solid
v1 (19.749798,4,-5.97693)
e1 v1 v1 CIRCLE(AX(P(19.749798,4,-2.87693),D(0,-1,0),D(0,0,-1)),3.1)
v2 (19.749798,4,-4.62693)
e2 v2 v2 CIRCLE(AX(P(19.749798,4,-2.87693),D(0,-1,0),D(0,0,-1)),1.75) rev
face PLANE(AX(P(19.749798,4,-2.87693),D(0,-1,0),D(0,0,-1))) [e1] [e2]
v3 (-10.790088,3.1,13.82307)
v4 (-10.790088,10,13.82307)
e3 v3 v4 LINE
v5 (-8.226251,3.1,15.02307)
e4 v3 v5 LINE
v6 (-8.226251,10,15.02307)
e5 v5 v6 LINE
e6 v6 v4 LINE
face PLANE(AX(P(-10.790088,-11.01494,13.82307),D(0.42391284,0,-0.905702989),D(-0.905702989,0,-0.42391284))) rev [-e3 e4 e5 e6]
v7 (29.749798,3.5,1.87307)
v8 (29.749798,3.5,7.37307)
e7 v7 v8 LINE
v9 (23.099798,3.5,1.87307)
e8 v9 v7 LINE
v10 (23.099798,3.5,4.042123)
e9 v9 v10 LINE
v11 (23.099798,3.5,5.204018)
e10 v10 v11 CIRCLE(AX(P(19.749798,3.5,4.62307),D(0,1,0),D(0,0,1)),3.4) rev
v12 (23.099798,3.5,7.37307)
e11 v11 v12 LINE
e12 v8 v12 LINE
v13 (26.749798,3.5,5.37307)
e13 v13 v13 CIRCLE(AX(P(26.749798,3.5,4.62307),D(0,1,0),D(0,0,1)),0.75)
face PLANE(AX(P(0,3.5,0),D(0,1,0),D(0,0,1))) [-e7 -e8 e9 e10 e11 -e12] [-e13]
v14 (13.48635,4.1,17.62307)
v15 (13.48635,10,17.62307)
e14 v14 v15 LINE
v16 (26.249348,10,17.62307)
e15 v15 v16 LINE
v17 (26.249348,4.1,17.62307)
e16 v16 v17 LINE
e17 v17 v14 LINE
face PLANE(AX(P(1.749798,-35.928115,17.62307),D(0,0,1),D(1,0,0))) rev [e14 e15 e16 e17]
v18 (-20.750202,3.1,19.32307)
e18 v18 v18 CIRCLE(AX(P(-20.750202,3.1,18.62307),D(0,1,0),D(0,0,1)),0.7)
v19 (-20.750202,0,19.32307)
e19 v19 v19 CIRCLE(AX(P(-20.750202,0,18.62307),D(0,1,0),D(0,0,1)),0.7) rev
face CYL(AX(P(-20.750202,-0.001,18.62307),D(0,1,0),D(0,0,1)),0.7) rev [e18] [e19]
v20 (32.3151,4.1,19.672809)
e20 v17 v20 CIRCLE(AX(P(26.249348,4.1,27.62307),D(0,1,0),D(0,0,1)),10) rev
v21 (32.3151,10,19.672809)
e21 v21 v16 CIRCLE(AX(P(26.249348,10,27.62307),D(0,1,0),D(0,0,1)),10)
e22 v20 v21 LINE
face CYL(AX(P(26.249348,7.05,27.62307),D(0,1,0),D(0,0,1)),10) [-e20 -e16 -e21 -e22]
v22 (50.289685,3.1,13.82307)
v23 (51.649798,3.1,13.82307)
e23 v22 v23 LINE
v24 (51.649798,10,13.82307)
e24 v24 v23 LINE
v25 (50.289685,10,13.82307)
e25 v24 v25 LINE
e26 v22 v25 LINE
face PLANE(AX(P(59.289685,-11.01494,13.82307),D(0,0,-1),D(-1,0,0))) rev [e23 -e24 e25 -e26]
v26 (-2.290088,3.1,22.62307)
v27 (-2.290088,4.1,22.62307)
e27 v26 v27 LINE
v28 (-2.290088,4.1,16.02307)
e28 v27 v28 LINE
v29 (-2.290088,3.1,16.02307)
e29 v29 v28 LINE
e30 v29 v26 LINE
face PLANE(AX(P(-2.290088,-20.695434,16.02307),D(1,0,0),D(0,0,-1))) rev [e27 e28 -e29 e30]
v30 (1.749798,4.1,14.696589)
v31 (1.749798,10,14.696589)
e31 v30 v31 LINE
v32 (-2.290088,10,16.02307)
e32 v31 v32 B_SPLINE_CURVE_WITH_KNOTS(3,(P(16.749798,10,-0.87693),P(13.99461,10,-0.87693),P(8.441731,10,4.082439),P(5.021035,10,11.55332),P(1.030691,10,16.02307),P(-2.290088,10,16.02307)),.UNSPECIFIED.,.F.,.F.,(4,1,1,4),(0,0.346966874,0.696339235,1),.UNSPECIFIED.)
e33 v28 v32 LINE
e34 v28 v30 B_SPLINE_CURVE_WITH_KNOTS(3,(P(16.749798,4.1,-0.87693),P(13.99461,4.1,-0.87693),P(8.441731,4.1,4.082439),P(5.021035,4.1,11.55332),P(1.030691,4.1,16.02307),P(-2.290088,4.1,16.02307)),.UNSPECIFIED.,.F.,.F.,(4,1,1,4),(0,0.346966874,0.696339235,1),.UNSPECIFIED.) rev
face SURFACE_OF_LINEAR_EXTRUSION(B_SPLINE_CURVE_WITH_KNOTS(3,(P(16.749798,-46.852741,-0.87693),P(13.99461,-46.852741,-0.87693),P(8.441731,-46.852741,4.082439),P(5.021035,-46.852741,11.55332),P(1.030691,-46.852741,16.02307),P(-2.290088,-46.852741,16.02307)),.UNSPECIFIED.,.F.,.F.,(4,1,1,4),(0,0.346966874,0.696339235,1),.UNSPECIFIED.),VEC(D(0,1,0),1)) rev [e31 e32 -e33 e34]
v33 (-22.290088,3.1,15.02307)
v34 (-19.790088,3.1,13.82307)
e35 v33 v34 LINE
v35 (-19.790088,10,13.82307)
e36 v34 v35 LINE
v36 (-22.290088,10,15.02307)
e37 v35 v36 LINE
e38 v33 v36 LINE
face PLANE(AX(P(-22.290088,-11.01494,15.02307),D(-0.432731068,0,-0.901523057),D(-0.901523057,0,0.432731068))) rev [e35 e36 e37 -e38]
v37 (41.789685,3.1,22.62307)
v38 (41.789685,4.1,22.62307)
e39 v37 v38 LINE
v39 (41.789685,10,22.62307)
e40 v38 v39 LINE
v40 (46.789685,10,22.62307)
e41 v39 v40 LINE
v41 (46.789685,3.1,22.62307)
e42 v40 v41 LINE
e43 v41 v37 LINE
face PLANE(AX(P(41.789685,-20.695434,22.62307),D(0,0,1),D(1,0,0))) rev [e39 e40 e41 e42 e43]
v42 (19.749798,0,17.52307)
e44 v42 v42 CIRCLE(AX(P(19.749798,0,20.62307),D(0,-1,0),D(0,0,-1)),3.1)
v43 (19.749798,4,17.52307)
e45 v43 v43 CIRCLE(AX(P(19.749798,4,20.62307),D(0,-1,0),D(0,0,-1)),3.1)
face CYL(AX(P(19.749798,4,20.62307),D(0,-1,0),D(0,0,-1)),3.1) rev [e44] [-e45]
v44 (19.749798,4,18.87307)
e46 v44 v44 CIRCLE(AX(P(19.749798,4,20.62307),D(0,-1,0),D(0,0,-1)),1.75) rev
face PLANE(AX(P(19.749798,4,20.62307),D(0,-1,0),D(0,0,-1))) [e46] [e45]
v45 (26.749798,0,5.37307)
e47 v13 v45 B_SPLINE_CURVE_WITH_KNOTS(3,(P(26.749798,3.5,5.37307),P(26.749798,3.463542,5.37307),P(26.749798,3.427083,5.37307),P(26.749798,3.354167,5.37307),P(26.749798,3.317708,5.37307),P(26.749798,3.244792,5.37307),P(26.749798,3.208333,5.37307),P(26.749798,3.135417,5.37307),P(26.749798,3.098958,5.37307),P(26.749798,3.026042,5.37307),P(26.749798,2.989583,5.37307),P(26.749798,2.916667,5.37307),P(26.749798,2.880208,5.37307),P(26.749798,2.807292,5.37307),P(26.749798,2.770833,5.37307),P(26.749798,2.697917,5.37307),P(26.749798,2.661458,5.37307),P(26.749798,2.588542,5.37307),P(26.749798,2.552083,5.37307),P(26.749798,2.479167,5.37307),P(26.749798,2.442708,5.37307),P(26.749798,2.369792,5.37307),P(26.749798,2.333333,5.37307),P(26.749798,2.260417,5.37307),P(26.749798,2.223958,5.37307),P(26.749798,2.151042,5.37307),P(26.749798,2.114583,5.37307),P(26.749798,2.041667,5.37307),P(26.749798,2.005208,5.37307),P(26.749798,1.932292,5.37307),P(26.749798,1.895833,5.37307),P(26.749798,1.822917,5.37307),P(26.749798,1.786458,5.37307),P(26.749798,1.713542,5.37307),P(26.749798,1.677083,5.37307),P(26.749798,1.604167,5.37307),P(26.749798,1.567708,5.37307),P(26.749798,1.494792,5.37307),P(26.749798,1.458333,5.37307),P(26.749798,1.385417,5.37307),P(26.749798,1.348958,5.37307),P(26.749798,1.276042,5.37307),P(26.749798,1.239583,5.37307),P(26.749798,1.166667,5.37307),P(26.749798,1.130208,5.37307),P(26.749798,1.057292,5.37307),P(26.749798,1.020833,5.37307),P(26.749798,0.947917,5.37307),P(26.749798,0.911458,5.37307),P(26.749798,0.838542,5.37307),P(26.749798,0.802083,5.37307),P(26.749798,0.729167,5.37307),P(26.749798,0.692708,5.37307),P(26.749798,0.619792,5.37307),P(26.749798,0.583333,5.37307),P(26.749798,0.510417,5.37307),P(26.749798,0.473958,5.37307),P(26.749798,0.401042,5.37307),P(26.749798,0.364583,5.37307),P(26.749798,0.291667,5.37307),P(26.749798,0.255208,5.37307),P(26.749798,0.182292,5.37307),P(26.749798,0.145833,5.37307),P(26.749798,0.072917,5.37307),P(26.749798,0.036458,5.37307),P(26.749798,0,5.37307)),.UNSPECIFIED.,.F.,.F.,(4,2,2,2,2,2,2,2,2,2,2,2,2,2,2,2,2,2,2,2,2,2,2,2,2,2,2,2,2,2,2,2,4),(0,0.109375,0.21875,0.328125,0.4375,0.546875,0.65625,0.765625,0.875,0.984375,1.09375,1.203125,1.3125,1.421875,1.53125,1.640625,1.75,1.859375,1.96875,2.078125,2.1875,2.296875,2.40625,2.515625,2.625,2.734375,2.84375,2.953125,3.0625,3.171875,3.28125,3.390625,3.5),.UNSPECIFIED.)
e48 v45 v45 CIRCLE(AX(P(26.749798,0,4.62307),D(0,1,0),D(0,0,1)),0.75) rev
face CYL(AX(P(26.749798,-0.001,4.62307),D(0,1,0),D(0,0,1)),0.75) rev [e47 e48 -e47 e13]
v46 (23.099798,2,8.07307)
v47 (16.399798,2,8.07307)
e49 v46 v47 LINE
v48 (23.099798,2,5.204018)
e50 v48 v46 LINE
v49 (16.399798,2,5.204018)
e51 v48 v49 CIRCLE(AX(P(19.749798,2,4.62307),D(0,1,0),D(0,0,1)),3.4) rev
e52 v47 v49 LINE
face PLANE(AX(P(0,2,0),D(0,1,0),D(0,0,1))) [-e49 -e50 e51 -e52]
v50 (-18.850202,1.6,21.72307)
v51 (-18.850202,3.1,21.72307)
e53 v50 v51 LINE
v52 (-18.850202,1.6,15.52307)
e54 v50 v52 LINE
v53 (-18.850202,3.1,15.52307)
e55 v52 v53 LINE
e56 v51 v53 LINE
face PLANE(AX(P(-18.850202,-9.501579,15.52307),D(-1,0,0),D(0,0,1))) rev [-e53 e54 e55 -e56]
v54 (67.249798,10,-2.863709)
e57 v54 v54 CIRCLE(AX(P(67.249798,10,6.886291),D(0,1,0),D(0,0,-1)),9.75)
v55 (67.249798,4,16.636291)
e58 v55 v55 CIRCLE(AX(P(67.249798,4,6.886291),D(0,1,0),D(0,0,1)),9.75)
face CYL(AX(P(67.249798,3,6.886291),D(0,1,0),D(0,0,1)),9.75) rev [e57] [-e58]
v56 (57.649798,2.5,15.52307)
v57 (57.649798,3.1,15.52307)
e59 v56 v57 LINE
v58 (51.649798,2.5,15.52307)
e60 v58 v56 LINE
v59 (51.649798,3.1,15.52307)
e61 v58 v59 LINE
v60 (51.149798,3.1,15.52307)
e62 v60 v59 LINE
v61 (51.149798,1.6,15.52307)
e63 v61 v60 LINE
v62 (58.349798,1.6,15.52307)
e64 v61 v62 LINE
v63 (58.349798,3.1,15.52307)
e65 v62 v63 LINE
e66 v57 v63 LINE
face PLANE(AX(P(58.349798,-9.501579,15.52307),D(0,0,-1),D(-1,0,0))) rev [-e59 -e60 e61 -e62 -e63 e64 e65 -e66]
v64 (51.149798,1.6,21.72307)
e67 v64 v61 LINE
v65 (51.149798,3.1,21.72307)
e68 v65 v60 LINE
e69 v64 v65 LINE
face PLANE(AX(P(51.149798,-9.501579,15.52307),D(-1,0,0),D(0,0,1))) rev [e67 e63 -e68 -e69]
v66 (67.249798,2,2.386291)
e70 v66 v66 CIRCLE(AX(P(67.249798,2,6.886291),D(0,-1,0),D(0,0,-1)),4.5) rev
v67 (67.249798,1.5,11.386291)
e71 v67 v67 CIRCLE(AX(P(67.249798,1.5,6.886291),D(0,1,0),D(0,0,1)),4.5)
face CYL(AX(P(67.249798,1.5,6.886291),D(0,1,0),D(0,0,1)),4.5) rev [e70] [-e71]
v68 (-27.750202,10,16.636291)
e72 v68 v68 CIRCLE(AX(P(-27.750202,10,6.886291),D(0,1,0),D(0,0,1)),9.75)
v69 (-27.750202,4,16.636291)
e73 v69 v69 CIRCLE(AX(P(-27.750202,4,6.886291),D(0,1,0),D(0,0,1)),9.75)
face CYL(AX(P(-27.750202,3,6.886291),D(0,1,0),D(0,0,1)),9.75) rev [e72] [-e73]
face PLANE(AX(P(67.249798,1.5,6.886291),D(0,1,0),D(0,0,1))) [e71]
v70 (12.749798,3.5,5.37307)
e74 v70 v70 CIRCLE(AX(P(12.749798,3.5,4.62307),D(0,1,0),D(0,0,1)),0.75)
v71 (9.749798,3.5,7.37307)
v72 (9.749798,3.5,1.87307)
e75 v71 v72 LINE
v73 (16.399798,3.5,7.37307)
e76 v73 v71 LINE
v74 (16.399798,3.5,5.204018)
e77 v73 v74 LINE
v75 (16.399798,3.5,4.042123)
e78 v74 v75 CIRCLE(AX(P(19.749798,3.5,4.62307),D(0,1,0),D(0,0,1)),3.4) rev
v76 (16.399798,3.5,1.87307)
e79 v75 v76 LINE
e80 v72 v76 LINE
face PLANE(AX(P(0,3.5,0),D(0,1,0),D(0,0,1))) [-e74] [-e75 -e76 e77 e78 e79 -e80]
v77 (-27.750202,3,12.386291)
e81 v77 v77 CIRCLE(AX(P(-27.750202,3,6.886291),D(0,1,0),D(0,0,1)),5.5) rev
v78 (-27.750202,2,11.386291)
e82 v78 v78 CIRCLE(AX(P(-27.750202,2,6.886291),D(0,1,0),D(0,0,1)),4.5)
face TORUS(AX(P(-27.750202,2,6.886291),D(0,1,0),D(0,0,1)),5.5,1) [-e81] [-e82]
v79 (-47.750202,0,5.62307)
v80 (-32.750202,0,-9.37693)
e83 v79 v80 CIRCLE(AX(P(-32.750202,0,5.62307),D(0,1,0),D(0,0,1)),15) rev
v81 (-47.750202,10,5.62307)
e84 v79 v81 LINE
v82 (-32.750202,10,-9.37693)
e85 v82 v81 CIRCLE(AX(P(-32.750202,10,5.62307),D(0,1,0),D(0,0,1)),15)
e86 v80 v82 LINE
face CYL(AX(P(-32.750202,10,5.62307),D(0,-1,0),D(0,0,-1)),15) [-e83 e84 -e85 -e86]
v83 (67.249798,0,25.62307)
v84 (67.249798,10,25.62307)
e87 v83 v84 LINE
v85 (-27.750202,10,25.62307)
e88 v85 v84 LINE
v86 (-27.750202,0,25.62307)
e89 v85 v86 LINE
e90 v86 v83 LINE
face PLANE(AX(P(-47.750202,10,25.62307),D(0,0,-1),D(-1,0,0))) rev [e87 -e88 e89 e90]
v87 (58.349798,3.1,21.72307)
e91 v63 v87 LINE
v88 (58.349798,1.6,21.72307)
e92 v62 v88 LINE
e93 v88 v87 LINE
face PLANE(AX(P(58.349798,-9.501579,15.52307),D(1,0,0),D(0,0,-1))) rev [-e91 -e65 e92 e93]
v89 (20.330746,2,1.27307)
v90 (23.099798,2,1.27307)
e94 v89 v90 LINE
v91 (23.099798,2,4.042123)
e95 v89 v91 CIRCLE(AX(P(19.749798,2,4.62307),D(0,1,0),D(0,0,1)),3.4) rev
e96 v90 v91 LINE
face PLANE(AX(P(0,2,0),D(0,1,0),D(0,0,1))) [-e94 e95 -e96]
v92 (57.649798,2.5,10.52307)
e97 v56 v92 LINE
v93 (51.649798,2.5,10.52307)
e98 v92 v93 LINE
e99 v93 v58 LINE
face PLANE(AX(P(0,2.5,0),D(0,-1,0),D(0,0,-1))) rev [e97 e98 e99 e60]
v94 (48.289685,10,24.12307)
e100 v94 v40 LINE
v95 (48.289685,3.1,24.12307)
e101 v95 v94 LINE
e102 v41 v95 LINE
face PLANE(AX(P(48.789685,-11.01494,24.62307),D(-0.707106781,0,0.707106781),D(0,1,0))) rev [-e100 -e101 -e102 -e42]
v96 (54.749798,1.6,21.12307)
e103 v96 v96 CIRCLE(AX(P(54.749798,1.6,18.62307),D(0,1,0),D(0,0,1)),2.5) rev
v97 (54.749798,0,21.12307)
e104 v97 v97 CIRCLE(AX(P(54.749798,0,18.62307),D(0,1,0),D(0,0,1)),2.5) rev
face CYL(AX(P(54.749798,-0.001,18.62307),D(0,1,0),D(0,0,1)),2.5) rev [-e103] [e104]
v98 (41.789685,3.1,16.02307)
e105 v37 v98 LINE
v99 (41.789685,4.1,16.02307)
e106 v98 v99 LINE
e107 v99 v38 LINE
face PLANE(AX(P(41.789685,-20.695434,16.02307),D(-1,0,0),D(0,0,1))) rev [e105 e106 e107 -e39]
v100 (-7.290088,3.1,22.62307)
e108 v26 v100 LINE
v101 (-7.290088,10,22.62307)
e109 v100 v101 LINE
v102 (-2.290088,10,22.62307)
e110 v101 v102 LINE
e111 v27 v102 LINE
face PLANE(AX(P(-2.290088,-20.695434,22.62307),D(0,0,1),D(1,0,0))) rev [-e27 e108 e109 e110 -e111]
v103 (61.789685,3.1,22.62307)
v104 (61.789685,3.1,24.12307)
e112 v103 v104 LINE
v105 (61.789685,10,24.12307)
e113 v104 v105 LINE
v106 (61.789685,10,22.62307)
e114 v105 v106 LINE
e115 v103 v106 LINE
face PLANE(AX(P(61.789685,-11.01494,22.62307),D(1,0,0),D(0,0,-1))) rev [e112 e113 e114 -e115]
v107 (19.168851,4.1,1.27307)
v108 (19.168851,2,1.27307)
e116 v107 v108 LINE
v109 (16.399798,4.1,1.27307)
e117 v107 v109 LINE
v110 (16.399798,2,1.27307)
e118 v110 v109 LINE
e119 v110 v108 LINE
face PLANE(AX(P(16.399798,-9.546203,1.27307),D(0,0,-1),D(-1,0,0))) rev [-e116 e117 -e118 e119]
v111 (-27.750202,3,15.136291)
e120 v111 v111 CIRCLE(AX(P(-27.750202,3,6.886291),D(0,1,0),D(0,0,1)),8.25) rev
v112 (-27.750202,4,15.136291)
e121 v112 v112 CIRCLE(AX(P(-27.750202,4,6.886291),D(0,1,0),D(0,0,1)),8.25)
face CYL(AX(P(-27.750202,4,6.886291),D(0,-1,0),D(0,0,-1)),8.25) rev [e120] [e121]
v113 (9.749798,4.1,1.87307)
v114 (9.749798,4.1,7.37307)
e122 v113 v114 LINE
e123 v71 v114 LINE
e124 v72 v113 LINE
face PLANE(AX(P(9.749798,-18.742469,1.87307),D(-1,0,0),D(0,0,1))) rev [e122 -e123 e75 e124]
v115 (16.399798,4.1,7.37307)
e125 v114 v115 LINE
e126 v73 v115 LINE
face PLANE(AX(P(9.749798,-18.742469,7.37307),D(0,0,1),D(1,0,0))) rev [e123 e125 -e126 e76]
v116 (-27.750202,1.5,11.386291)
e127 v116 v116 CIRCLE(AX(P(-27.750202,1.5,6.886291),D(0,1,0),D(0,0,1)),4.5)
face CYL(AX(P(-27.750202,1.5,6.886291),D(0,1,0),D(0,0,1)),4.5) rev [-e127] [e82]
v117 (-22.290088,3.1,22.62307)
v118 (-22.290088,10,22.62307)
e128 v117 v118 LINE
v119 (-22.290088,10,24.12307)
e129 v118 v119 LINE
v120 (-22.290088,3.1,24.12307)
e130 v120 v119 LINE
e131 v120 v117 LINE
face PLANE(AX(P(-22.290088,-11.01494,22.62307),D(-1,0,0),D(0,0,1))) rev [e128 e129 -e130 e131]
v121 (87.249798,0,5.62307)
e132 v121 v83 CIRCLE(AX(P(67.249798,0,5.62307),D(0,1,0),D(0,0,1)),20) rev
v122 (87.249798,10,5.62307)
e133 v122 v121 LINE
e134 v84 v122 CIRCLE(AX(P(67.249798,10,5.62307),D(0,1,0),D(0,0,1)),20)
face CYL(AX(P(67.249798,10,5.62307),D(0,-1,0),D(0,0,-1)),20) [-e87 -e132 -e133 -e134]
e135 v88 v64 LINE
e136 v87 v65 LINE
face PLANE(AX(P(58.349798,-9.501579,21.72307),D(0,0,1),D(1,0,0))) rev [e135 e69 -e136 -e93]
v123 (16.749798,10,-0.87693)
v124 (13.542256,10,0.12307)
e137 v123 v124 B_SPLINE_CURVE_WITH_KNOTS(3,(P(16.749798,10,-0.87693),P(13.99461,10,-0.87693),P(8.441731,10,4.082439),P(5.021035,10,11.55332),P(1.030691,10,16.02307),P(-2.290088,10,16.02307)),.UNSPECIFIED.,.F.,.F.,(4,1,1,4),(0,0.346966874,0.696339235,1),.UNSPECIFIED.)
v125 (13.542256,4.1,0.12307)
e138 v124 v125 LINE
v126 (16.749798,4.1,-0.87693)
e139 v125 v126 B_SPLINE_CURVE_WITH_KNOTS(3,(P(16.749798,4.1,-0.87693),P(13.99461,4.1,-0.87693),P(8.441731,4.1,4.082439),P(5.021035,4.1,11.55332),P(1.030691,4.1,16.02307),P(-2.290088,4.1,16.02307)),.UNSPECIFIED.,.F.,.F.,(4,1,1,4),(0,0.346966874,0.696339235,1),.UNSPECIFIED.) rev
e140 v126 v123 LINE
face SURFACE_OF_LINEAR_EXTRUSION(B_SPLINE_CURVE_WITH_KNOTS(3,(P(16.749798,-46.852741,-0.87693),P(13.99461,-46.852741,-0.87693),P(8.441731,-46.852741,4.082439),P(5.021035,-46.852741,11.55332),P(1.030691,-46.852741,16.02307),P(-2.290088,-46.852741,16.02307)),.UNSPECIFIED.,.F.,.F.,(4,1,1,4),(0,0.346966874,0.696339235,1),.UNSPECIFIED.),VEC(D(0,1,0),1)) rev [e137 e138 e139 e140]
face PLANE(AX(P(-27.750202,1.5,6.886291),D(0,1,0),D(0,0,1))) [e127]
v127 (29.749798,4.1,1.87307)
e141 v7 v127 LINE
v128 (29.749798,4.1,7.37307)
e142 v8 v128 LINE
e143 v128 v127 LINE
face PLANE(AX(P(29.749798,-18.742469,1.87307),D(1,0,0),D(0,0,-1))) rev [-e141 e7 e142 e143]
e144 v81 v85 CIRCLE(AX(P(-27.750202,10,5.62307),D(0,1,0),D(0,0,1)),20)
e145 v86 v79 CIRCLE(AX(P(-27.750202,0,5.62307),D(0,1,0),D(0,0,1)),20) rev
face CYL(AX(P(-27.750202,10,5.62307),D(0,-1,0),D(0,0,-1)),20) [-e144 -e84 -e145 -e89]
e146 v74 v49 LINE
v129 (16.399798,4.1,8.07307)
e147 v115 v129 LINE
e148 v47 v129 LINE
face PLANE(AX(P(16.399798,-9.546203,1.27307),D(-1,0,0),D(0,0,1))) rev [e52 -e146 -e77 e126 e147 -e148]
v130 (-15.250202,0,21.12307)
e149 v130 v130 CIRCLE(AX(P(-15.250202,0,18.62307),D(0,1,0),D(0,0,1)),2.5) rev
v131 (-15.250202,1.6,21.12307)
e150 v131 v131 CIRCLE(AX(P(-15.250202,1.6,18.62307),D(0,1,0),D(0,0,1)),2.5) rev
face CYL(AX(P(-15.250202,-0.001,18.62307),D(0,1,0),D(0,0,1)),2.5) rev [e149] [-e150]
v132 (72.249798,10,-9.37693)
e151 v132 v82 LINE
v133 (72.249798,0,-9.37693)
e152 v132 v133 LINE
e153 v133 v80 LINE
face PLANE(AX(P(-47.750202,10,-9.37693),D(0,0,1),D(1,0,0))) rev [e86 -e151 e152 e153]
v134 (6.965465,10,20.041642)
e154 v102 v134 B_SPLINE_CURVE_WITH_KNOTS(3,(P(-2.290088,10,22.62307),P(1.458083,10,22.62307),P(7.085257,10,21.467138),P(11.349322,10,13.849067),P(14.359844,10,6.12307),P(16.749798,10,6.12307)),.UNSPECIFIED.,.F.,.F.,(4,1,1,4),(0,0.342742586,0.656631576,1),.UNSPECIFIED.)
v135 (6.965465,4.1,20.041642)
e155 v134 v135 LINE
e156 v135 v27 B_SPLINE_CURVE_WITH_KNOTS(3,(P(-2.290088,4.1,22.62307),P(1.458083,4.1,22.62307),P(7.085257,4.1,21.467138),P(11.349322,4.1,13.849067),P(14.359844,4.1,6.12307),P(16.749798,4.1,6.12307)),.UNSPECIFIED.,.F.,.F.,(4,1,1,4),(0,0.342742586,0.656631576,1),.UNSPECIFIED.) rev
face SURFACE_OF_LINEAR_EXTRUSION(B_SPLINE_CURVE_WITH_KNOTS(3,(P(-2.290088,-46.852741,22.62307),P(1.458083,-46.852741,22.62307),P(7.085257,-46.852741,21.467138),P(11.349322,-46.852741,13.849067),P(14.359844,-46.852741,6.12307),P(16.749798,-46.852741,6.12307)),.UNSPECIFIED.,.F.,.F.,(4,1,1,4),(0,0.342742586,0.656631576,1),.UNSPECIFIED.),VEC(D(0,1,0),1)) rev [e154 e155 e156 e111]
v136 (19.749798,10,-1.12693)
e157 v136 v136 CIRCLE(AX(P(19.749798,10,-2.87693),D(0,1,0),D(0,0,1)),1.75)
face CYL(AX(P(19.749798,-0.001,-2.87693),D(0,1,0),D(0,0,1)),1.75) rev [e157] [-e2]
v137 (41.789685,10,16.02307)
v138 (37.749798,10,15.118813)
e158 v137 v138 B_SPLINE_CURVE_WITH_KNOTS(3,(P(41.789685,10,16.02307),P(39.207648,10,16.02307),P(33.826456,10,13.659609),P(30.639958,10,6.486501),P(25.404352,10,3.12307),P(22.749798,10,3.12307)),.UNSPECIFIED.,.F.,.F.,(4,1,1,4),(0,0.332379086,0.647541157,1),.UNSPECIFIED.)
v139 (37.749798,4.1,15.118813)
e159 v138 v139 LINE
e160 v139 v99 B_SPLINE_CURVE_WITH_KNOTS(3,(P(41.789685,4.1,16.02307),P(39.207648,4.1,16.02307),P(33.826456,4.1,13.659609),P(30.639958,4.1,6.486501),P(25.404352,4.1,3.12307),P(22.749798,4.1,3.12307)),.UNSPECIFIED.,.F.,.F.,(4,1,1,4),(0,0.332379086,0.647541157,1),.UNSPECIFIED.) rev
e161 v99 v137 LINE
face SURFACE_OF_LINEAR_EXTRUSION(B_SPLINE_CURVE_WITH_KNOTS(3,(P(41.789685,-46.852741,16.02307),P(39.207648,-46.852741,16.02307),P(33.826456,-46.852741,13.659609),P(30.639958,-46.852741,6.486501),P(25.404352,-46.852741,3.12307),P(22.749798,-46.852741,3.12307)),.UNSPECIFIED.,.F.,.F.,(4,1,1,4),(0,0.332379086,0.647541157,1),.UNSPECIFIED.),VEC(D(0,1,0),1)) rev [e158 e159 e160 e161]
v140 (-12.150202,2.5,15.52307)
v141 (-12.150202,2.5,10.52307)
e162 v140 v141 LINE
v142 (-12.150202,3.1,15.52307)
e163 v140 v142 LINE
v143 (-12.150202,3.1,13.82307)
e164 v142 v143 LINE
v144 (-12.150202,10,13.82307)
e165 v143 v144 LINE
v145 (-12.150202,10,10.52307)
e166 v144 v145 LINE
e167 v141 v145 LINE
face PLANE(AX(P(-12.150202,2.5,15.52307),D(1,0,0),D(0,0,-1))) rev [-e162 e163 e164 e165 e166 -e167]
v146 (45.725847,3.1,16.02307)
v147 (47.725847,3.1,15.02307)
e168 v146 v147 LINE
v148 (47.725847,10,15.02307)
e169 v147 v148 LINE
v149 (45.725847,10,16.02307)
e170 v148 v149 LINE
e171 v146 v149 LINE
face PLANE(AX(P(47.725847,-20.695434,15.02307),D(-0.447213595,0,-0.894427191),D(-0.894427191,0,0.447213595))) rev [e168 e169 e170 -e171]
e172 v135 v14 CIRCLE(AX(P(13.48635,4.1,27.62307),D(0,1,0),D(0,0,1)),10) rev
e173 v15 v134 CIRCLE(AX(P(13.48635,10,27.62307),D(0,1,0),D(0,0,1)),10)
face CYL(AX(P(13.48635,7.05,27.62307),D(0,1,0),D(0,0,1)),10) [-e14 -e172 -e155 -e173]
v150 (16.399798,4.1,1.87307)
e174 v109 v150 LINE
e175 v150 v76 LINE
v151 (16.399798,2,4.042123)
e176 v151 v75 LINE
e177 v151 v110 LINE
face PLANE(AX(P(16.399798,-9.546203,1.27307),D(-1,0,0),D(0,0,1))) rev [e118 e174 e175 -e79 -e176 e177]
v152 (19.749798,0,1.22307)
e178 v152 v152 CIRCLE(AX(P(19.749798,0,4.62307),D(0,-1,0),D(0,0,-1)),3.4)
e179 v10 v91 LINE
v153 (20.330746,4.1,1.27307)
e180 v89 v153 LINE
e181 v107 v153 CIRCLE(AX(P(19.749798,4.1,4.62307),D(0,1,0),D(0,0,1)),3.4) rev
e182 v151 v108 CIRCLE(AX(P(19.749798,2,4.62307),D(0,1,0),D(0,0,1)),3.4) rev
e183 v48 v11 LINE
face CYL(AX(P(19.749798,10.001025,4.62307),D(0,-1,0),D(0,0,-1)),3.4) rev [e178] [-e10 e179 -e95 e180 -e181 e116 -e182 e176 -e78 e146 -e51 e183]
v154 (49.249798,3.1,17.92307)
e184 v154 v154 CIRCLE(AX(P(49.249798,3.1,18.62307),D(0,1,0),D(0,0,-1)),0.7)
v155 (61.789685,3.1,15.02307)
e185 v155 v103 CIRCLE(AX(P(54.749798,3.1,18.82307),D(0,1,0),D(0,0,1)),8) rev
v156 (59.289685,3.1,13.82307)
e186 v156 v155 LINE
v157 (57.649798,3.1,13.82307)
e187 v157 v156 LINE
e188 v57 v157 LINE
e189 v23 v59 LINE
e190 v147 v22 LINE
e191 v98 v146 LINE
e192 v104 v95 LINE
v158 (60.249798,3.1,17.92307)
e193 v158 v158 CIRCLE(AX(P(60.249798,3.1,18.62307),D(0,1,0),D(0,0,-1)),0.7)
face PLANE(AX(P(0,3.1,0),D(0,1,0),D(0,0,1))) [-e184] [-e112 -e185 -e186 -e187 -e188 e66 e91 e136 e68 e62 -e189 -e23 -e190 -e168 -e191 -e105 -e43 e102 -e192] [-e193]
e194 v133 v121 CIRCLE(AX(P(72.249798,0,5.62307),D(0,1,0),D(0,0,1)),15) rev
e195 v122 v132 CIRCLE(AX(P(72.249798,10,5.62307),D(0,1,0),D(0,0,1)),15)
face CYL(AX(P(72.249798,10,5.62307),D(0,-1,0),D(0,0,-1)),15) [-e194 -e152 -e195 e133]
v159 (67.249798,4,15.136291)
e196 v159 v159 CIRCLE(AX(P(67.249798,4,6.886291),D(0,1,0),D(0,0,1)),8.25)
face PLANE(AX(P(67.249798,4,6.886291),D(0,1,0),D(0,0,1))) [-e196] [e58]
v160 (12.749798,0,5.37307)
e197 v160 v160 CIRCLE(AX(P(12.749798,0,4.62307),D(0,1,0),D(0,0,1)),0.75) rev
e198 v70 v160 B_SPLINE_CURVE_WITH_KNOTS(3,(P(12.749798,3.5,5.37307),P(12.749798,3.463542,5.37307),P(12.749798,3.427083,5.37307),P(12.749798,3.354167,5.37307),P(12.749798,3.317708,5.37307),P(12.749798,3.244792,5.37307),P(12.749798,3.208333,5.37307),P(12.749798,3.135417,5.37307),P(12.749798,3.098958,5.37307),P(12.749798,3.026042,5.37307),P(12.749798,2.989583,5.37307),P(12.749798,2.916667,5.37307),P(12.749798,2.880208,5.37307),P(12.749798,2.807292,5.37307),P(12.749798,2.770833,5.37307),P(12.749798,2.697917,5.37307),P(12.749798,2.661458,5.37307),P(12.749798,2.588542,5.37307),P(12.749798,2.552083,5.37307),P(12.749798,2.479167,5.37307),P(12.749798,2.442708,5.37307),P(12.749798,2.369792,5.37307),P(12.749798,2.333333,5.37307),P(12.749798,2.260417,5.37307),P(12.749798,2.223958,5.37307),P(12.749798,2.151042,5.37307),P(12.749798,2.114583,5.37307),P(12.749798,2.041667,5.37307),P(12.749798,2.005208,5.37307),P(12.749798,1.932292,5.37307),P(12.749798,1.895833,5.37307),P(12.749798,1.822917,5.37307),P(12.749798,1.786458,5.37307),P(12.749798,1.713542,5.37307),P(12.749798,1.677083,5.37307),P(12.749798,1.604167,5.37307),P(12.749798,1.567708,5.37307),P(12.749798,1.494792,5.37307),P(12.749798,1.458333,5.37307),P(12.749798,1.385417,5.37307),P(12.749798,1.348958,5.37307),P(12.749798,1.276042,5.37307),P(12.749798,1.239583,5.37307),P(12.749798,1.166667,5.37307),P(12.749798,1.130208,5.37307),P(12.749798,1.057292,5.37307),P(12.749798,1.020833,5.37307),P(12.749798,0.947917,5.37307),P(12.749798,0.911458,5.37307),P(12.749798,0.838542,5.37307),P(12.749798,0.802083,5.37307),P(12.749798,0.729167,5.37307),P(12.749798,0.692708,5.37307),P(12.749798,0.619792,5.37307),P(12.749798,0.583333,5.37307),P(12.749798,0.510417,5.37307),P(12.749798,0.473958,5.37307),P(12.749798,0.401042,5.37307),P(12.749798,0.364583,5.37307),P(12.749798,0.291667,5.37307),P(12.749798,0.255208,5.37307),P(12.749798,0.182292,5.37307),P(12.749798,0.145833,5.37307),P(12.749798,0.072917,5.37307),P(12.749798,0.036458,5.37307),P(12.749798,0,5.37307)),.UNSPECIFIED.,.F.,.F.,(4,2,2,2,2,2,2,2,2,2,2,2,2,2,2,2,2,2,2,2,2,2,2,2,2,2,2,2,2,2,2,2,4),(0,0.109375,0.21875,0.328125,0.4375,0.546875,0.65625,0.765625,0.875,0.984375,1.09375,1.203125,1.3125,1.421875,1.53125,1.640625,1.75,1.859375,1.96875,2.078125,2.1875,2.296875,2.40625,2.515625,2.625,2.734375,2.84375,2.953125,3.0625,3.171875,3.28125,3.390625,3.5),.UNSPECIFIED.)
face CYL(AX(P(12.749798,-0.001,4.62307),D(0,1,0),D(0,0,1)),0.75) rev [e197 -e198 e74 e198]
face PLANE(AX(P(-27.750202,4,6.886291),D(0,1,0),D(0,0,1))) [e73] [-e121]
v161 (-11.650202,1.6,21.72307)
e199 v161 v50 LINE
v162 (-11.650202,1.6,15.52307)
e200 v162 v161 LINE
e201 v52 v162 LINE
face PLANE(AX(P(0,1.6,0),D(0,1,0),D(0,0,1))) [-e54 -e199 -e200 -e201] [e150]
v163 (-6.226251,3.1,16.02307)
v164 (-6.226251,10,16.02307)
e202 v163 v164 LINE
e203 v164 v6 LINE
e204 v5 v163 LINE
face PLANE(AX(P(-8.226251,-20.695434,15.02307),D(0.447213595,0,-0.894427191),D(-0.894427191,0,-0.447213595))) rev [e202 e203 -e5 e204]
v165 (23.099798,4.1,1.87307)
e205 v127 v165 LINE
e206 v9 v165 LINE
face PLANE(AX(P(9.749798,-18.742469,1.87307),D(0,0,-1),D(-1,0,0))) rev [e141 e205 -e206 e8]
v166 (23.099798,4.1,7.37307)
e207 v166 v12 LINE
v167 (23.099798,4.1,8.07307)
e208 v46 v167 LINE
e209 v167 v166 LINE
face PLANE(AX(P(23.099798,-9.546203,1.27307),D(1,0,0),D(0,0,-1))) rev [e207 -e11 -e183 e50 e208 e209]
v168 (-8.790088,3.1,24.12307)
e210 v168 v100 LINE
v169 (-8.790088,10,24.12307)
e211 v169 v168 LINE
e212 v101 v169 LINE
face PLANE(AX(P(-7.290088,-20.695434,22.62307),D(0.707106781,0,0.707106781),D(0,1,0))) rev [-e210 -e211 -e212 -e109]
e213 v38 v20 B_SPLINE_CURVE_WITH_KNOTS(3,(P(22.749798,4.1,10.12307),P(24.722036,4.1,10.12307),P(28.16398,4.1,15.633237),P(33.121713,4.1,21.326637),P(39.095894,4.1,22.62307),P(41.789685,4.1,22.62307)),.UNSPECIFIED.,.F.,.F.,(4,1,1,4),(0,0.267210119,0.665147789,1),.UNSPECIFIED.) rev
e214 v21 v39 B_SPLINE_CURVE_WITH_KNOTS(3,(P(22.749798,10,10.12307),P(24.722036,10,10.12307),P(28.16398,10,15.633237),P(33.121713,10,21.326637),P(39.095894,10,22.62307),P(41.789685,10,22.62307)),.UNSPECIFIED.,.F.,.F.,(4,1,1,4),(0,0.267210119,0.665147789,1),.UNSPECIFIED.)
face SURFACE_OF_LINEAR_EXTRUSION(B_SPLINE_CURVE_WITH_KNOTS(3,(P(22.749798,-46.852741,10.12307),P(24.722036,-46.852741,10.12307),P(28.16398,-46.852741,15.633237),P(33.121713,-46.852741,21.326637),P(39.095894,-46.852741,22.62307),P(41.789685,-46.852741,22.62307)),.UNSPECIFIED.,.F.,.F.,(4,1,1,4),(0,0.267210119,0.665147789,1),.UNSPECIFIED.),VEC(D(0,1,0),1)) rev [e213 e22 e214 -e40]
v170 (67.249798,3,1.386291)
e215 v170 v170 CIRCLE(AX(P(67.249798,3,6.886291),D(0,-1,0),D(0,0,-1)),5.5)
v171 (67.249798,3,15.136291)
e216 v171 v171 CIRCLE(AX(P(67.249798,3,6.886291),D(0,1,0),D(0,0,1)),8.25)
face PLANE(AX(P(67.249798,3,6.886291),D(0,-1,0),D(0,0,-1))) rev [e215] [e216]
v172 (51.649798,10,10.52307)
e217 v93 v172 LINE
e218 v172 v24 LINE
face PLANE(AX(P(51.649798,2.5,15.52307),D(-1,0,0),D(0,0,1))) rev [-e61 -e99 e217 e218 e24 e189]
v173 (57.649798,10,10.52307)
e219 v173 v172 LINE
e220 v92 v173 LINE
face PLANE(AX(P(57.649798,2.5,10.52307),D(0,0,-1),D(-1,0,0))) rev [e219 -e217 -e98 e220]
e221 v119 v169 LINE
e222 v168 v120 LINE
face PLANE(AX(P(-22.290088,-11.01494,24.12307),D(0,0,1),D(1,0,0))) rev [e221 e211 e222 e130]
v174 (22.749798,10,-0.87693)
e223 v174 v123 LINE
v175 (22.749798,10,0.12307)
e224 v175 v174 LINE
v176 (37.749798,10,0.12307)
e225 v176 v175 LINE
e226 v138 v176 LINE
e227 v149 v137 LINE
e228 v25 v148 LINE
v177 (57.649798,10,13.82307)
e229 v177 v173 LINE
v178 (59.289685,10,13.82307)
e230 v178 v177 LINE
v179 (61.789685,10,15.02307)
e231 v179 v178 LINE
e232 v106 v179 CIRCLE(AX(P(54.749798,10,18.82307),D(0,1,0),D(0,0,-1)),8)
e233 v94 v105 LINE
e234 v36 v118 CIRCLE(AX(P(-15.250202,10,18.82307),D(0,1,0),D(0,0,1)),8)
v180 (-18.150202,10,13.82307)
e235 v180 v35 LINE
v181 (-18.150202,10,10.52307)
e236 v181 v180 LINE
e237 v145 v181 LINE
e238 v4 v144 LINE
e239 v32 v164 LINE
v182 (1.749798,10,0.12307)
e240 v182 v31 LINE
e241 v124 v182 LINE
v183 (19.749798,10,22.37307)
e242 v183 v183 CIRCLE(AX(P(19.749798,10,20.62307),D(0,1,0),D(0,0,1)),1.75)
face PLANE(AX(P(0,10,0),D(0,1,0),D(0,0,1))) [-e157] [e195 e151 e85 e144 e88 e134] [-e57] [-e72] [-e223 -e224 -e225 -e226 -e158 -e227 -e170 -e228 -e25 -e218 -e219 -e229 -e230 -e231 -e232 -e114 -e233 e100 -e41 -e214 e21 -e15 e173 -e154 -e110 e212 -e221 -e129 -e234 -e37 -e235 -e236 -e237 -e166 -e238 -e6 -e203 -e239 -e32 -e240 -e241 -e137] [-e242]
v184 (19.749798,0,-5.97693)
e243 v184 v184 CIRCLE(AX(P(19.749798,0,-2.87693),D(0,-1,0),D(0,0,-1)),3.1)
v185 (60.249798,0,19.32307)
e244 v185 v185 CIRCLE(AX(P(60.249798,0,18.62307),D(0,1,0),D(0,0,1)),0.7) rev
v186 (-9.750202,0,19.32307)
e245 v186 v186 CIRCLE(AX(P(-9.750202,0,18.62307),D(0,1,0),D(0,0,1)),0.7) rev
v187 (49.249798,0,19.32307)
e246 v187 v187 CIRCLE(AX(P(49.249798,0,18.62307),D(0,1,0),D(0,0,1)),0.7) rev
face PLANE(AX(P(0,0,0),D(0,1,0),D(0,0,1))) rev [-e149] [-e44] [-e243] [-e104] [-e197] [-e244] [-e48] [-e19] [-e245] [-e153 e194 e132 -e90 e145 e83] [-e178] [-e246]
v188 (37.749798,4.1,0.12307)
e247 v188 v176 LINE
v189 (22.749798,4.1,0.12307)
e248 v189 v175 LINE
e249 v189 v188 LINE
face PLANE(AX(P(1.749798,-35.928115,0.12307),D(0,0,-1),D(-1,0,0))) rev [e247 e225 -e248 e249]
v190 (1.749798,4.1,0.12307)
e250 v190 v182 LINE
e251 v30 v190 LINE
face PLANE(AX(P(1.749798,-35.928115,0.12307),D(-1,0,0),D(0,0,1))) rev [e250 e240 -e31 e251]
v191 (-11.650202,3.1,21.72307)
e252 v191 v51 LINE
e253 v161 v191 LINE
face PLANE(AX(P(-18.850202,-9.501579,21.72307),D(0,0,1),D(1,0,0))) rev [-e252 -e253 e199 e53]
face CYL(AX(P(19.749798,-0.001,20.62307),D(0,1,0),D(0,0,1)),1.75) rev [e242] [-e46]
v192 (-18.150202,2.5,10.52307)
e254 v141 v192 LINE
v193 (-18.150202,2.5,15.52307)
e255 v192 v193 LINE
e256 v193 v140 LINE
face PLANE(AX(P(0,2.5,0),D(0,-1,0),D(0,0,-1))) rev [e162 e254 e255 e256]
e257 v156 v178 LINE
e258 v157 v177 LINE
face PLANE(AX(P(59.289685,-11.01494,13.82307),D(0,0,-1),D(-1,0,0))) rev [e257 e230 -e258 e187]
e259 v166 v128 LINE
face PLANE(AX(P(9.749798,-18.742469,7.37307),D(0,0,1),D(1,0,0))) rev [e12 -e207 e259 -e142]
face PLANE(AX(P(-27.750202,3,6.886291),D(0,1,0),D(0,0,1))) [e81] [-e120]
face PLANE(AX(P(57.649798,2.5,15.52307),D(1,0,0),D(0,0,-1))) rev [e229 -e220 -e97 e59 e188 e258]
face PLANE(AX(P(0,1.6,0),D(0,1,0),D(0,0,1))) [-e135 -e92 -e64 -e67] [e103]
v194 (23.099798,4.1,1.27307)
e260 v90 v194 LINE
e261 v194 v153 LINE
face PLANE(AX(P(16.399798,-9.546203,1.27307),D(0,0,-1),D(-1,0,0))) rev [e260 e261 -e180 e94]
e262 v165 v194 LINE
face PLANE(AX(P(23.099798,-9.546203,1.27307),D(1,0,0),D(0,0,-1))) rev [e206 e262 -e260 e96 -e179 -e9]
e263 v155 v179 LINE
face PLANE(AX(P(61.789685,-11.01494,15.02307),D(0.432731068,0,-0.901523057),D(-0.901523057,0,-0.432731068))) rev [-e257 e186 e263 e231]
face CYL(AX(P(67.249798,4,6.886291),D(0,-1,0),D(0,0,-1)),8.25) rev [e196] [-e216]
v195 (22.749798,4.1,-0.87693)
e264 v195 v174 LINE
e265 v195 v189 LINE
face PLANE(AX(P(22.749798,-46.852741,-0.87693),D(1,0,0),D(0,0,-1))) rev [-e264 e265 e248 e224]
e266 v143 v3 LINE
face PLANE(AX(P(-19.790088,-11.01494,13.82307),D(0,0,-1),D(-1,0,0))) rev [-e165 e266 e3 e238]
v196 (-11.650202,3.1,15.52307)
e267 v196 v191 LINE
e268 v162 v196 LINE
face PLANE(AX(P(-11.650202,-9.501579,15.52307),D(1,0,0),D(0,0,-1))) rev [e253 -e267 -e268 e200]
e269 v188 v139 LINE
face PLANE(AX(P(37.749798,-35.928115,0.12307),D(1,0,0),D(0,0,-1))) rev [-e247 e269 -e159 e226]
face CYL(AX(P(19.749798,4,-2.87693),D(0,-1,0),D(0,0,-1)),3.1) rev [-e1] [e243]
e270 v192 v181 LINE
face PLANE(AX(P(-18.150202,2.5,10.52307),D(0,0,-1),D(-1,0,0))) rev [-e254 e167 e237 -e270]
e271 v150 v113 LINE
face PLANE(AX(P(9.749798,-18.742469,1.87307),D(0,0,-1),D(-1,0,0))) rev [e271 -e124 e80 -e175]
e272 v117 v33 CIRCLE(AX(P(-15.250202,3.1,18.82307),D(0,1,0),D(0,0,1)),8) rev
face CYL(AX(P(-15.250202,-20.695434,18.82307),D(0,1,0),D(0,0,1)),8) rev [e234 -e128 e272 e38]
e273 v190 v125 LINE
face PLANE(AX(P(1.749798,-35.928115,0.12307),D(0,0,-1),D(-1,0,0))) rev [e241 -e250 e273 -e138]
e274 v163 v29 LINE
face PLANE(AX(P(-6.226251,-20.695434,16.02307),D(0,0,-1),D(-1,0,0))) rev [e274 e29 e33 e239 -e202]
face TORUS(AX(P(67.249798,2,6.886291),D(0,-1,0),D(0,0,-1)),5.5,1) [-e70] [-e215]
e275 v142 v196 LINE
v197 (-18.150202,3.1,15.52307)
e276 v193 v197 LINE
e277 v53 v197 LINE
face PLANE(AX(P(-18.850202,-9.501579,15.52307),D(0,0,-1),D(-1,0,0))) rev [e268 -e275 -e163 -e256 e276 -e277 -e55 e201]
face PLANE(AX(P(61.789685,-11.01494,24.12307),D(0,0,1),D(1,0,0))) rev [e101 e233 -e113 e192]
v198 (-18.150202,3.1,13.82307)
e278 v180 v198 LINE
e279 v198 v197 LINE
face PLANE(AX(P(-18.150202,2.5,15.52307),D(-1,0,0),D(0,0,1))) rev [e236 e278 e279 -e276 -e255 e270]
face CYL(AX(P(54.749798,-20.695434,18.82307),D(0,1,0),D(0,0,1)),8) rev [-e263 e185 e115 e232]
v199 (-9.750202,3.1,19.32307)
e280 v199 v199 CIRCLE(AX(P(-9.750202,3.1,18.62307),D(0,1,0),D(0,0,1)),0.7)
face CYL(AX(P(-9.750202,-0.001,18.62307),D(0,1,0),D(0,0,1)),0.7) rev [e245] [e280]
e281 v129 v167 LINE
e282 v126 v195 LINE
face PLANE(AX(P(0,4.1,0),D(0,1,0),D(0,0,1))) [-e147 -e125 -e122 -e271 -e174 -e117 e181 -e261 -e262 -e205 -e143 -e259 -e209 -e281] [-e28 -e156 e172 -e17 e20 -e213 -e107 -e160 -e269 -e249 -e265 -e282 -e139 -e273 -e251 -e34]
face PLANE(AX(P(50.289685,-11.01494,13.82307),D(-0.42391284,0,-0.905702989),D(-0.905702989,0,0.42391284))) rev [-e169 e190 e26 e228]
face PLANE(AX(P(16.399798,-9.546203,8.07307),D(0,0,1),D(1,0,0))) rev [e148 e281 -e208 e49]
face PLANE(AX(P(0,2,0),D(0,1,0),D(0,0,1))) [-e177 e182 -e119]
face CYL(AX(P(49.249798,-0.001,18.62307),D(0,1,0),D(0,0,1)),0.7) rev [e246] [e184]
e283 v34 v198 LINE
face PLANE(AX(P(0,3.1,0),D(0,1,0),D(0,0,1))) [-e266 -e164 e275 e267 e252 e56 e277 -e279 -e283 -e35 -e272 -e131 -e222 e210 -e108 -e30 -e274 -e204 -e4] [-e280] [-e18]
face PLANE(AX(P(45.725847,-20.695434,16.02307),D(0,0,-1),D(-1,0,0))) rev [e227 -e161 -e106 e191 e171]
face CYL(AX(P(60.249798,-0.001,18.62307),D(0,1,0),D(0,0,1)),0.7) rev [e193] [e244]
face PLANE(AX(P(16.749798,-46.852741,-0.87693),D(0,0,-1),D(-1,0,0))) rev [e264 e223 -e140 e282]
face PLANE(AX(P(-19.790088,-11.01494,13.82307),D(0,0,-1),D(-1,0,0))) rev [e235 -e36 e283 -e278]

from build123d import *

# Parameters (mm, degrees)
SKETCH1_W                = 135
SKETCH1_H                = 35
BOSS_EXTRUDE1_DEPTH      = 10
FILLET1_R                = 20
CUT_EXTRUDE3_REACH       = 93.483
SKETCH5_R                = 1.75
SKETCH6_R                = 3.1
CUT_EXTRUDE4_DEPTH       = 4
FILLET2_R                = 15
SKETCH3_R                = 9.75
CUT_EXTRUDE5_DEPTH       = 7
BOSS_EXTRUDE2_START      = 1
SKETCH9_R                = 9.75
SKETCH9_R_2              = 8.25
BOSS_EXTRUDE2_DEPTH      = 1
SKETCH10_R               = 4.5
CUT_EXTRUDE6_DEPTH       = 1.5
FILLET3_R                = 1
CUT_EXTRUDE7_REACH       = 93.483
SKETCH7_R                = 2.5
SKETCH11_W               = 7.2
SKETCH11_H               = 6.2
CUT_EXTRUDE8_DEPTH       = 8.4
CUT_EXTRUDE9_DEPTH       = 6.9
CUT_EXTRUDE10_DEPTH      = 5.9
CUT_EXTRUDE11_REACH      = 93.483
SKETCH14_R               = 3.4
CUT_EXTRUDE12_DEPTH      = 5.9
CUT_EXTRUDE12_DEPTH_BACK = 2.1
SKETCH15_W               = 6.7
SKETCH15_H               = 6.8
SKETCH16_W               = 36
SKETCH16_H               = 17.5
CUT_EXTRUDE13_DEPTH      = 5.9
SKETCH18_W               = 6
SKETCH18_H               = 5
CUT_EXTRUDE14_DEPTH      = 7.5
SKETCH19_W               = 13
SKETCH19_H               = 1.5
CUT_EXTRUDE15_DEPTH      = 6.9
CHAMFER1_SIZE            = 2
CUT_EXTRUDE16_REACH      = 93.196
SKETCH20_R               = 0.7
SKETCH22_W               = 20
SKETCH22_H               = 5.5
CUT_EXTRUDE18_DEPTH      = 0.6
CUT_EXTRUDE19_REACH      = 93.166
SKETCH23_R               = 0.75
FILLET4_R                = 10


# Some blends are built 0.0001 mm under size
with BuildPart() as part:
    # Sketch1 → Boss-Extrude1 (new body)
    with BuildSketch(Plane(origin=(0, 0, 0), x_dir=(1, 0, 0), z_dir=(0, 1, 0))):
        with Locations((19.749798241, -8.123070146)):
            Rectangle(SKETCH1_W, SKETCH1_H)
    extrude(amount=BOSS_EXTRUDE1_DEPTH)

    # Fillet1
    fillet1_edges = [part.edges().sort_by_distance(p)[0] for p in [
        (87.249798241, 5, 25.623070146),
        (-47.750201759, 5, 25.623070146),
    ]]
    fillet(fillet1_edges, radius=FILLET1_R)

    # Sketch5 → Cut-Extrude3 (cut, up to next)
    with BuildSketch(Plane(origin=(0, 10, 0), x_dir=(1, 0, 0), z_dir=(0, 1, 0)), mode=Mode.PRIVATE) as cut_extrude3_sk1:
        with Locations(Location((19.749798241, 2.876929854, 0), (0, 0, 270))):
            Circle(SKETCH5_R)
    cut_extrude3_tool1 = extrude(cut_extrude3_sk1.sketch, amount=-CUT_EXTRUDE3_REACH, mode=Mode.PRIVATE) & part.part
    # Sketch5 → Cut-Extrude3 (cut, up to next)
    with BuildSketch(Plane(origin=(0, 10, 0), x_dir=(1, 0, 0), z_dir=(0, 1, 0)), mode=Mode.PRIVATE) as cut_extrude3_sk2:
        with Locations(Location((19.749798241, -20.623070146, 0), (0, 0, 270))):
            Circle(SKETCH5_R)
    cut_extrude3_tool2 = extrude(cut_extrude3_sk2.sketch, amount=-CUT_EXTRUDE3_REACH, mode=Mode.PRIVATE) & part.part
    add(cut_extrude3_tool1.solids().sort_by_distance((19.749798, 10, -2.87693))[0], mode=Mode.SUBTRACT)
    add(cut_extrude3_tool2.solids().sort_by_distance((19.749798, 10, 20.62307))[0], mode=Mode.SUBTRACT)

    # Sketch6 → Cut-Extrude4 (cut)
    with BuildSketch(Plane.XZ):
        with Locations(Location((19.749798241, 20.623070146, 0), (0, 0, 270))):
            Circle(SKETCH6_R)
        with Locations(Location((19.749798241, -2.876929854, 0), (0, 0, 270))):
            Circle(SKETCH6_R)
    extrude(amount=-CUT_EXTRUDE4_DEPTH, mode=Mode.SUBTRACT)

    # Fillet2
    fillet2_edges = [part.edges().sort_by_distance(p)[0] for p in [
        (-47.750201759, 5, -9.376929854),
        (87.249798241, 5, -9.376929854),
    ]]
    fillet(fillet2_edges, radius=FILLET2_R - 0.0001)  # a hair under: the kernel refuses the full size

    # Sketch3 → Cut-Extrude5 (cut)
    with BuildSketch(Plane(origin=(0, 10, 0), x_dir=(1, 0, 0), z_dir=(0, 1, 0))):
        with Locations(Location((-27.750201759, -6.88629089, 0), (0, 0, 270))):
            Circle(SKETCH3_R)
        with Locations(Location((67.249798241, -6.88629089, 0), (0, 0, 90))):
            Circle(SKETCH3_R)
    extrude(amount=-CUT_EXTRUDE5_DEPTH, mode=Mode.SUBTRACT)

    # Sketch9 → Boss-Extrude2 (add)
    # profile 1 of 2: a face of its own
    with BuildSketch(Plane(origin=(0, 3, 0), x_dir=(1, 0, 0), z_dir=(0, 1, 0)).offset(BOSS_EXTRUDE2_START)):
        with Locations(Location((-27.750201759, -6.88629089, 0), (0, 0, 270))):
            Circle(SKETCH9_R)
        with Locations(Location((-27.750201759, -6.88629089, 0), (0, 0, 270))):
            Circle(SKETCH9_R_2, mode=Mode.SUBTRACT)
    # profile 2 of 2: a face of its own
    with BuildSketch(Plane(origin=(0, 3, 0), x_dir=(1, 0, 0), z_dir=(0, 1, 0)).offset(BOSS_EXTRUDE2_START)):
        with Locations(Location((67.249798241, -6.88629089, 0), (0, 0, 270))):
            Circle(SKETCH9_R)
        with Locations(Location((67.249798241, -6.88629089, 0), (0, 0, 270))):
            Circle(SKETCH9_R_2, mode=Mode.SUBTRACT)
    extrude(amount=-BOSS_EXTRUDE2_DEPTH)

    # Sketch10 → Cut-Extrude6 (cut)
    with BuildSketch(Plane(origin=(0, 3, 0), x_dir=(1, 0, 0), z_dir=(0, 1, 0))):
        with Locations(Location((-27.750201759, -6.88629089, 0), (0, 0, 270))):
            Circle(SKETCH10_R)
        with Locations(Location((67.249798241, -6.88629089, 0), (0, 0, 270))):
            Circle(SKETCH10_R)
    extrude(amount=-CUT_EXTRUDE6_DEPTH, mode=Mode.SUBTRACT)

    # Fillet3
    fillet3_edges = [part.edges().sort_by_distance(p)[0] for p in [
        (-27.750201759, 3, 2.38629089),
        (67.249798241, 3, 2.38629089),
    ]]
    fillet(fillet3_edges, radius=FILLET3_R)

    # Sketch7 → Cut-Extrude7 (cut, up to next)
    with BuildSketch(Plane(origin=(0, 10, 0), x_dir=(1, 0, 0), z_dir=(0, 1, 0)), mode=Mode.PRIVATE) as cut_extrude7_sk1:
        with Locations(Location((-15.250201759, -18.623070146, 0), (0, 0, 270))):
            Circle(SKETCH7_R)
    cut_extrude7_tool1 = extrude(cut_extrude7_sk1.sketch, amount=-CUT_EXTRUDE7_REACH, mode=Mode.PRIVATE) & part.part
    # Sketch7 → Cut-Extrude7 (cut, up to next)
    with BuildSketch(Plane(origin=(0, 10, 0), x_dir=(1, 0, 0), z_dir=(0, 1, 0)), mode=Mode.PRIVATE) as cut_extrude7_sk2:
        with Locations(Location((54.749798241, -18.623070146, 0), (0, 0, 270))):
            Circle(SKETCH7_R)
    cut_extrude7_tool2 = extrude(cut_extrude7_sk2.sketch, amount=-CUT_EXTRUDE7_REACH, mode=Mode.PRIVATE) & part.part
    add(cut_extrude7_tool1.solids().sort_by_distance((-15.250202, 10, 18.62307))[0], mode=Mode.SUBTRACT)
    add(cut_extrude7_tool2.solids().sort_by_distance((54.749798, 10, 18.62307))[0], mode=Mode.SUBTRACT)

    # Sketch11 → Cut-Extrude8 (cut)
    with BuildSketch(Plane(origin=(0, 10, 0), x_dir=(1, 0, 0), z_dir=(0, 1, 0))):
        with Locations((-15.250201759, -18.623070146)):
            Rectangle(SKETCH11_W, SKETCH11_H)
        with Locations((54.749798241, -18.623070146)):
            Rectangle(SKETCH11_W, SKETCH11_H)
    extrude(amount=-CUT_EXTRUDE8_DEPTH, mode=Mode.SUBTRACT)

    # Sketch12 → Cut-Extrude9 (cut)
    with BuildSketch(Plane(origin=(0, 10, 0), x_dir=(1, 0, 0), z_dir=(0, 1, 0))):
        with BuildLine():
            Line((-2.290088122, -16.023070146), (-2.290088122, -22.623070146))
            Line((-2.290088122, -22.623070146), (-22.290088122, -22.623070146))
            ThreePointArc((-22.290088122, -22.623070146), (-23.250201759, -18.823070146), (-22.290088122, -15.023070146))
            Line((-22.290088122, -15.023070146), (-8.226250735, -15.023070146))
            Line((-8.226250735, -15.023070146), (-6.226250735, -16.023070146))
            Line((-6.226250735, -16.023070146), (-2.290088122, -16.023070146))
        make_face()
        with BuildLine():
            Line((45.725847218, -16.023070146), (41.789684604, -16.023070146))
            Line((41.789684604, -16.023070146), (41.789684604, -22.623070146))
            Line((41.789684604, -22.623070146), (61.789684604, -22.623070146))
            ThreePointArc((61.789684604, -22.623070146), (62.749798241, -18.823070146), (61.789684604, -15.023070146))
            Line((61.789684604, -15.023070146), (47.725847218, -15.023070146))
            Line((47.725847218, -15.023070146), (45.725847218, -16.023070146))
        make_face()
    extrude(amount=-CUT_EXTRUDE9_DEPTH, mode=Mode.SUBTRACT)

    # Sketch13 → Cut-Extrude10 (cut)
    with BuildSketch(Plane(origin=(0, 10, 0), x_dir=(1, 0, 0), z_dir=(0, 1, 0))):
        with BuildLine():
            Line((16.749798241, -6.123070146), (16.749798241, -10.123070146))
            Line((16.749798241, -10.123070146), (22.749798241, -10.123070146))
            add(Edge.make_bspline(
                [(22.749798241, -10.123070146), (24.722036045, -10.123070146), (28.163979579, -15.633237451), (33.12171253, -21.326637483), (39.095893997, -22.623070146), (41.789684604, -22.623070146)],
                knots=[0, 0, 0, 0, 0.267210119, 0.665147789, 1, 1, 1, 1], degree=3))
            Line((41.789684604, -22.623070146), (41.789684604, -16.023070146))
            add(Edge.make_bspline(
                [(22.749798241, -3.123070146), (25.404352013, -3.123070146), (30.639958492, -6.486500824), (33.826455572, -13.659608817), (39.207647597, -16.023070146), (41.789684604, -16.023070146)],
                knots=[0, 0, 0, 0, 0.352458843, 0.667620914, 1, 1, 1, 1], degree=3))
            Line((22.749798241, -3.123070146), (22.749798241, 0.876929854))
            Line((22.749798241, 0.876929854), (16.749798241, 0.876929854))
            add(Edge.make_bspline(
                [(-2.290088122, -16.023070146), (1.030690921, -16.023070146), (5.021034942, -11.553320405), (8.441730898, -4.082439458), (13.994609535, 0.876929854), (16.749798241, 0.876929854)],
                knots=[0, 0, 0, 0, 0.303660765, 0.653033126, 1, 1, 1, 1], degree=3))
            Line((-2.290088122, -16.023070146), (-2.290088122, -22.623070146))
            add(Edge.make_bspline(
                [(-2.290088122, -22.623070146), (1.458082619, -22.623070146), (7.085257022, -21.467137706), (11.349322106, -13.849067405), (14.359844143, -6.123070146), (16.749798241, -6.123070146)],
                knots=[0, 0, 0, 0, 0.342742586, 0.656631576, 1, 1, 1, 1], degree=3))
        make_face()
    extrude(amount=-CUT_EXTRUDE10_DEPTH, mode=Mode.SUBTRACT)

    # Sketch14 → Cut-Extrude11 (cut, up to next)
    with BuildSketch(Plane.XZ, mode=Mode.PRIVATE) as cut_extrude11_sk1:
        with Locations(Location((19.749798241, 4.623070146, 0), (0, 0, 270))):
            Circle(SKETCH14_R)
    cut_extrude11_tool1 = extrude(cut_extrude11_sk1.sketch, amount=-CUT_EXTRUDE11_REACH, mode=Mode.PRIVATE) & part.part
    add(cut_extrude11_tool1.solids().sort_by_distance((19.749798, 0, 4.62307))[0], mode=Mode.SUBTRACT)

    # Sketch15 → Cut-Extrude12 (cut, two sides: drawn at the far end of the back side and taken through both)
    with BuildSketch(Plane(origin=(0, 4.1, 0), x_dir=(1, 0, 0), z_dir=(0, 1, 0)).offset(-CUT_EXTRUDE12_DEPTH_BACK)):
        with Locations((19.749798241, -4.673070146)):
            Rectangle(SKETCH15_W, SKETCH15_H)
    extrude(amount=CUT_EXTRUDE12_DEPTH + CUT_EXTRUDE12_DEPTH_BACK, mode=Mode.SUBTRACT)

    # Sketch16 → Cut-Extrude13 (cut)
    with BuildSketch(Plane(origin=(0, 10, 0), x_dir=(1, 0, 0), z_dir=(0, 1, 0))):
        with Locations((19.749798241, -8.873070146)):
            Rectangle(SKETCH16_W, SKETCH16_H)
    extrude(amount=-CUT_EXTRUDE13_DEPTH, mode=Mode.SUBTRACT)

    # Sketch18 → Cut-Extrude14 (cut)
    with BuildSketch(Plane(origin=(0, 10, 0), x_dir=(1, 0, 0), z_dir=(0, 1, 0))):
        with Locations((-15.150201759, -13.023070146)):
            Rectangle(SKETCH18_W, SKETCH18_H)
        with Locations((54.649798241, -13.023070146)):
            Rectangle(SKETCH18_W, SKETCH18_H)
    extrude(amount=-CUT_EXTRUDE14_DEPTH, mode=Mode.SUBTRACT)

    # Sketch19 → Cut-Extrude15 (cut)
    with BuildSketch(Plane(origin=(0, 10, 0), x_dir=(1, 0, 0), z_dir=(0, 1, 0))):
        with Locations((-15.790088122, -23.373070146)):
            Rectangle(SKETCH19_W, SKETCH19_H)
        with Locations((55.289684604, -23.373070146)):
            Rectangle(SKETCH19_W, SKETCH19_H)
        Polygon((-22.290088122, -15.023070146), (-19.790088122, -13.823070146), (-10.790088122, -13.823070146), (-8.226250735, -15.023070146), align=None)
        Polygon((47.725847218, -15.023070146), (61.789684604, -15.023070146), (59.289684604, -13.823070146), (50.289684604, -13.823070146), align=None)
    extrude(amount=-CUT_EXTRUDE15_DEPTH, mode=Mode.SUBTRACT)

    # Chamfer1
    # the kernel refuses this chamfer: 2 mm, written as the material it takes off along each edge
    with BuildSketch(Plane(origin=(48.789684604, 15.143365976, 22.623070146), x_dir=(-0.9996219169112968, 0, -0.027495876610585647), z_dir=(0, -1, 0))) as chamfer1_piece_1_section:
        Polygon((CHAMFER1_SIZE * 0.999621916911, -CHAMFER1_SIZE * 0.0274958766106), (-CHAMFER1_SIZE * 0.0274958766106, -CHAMFER1_SIZE * 0.999621916911), (0, 0), align=None)
    chamfer1_piece_1 = extrude(amount=12.043365976, mode=Mode.PRIVATE)
    chamfer1_piece_1 = split(chamfer1_piece_1, bisect_by=Plane(origin=(48.085766383, 9.121682988, 24.123070146), z_dir=(0, 0, -1)), keep=Keep.TOP, mode=Mode.PRIVATE)
    add(chamfer1_piece_1, mode=Mode.SUBTRACT)
    with BuildSketch(Plane(origin=(-9.290088122, 15.143365976, 22.623070146), x_dir=(-0.02749587661058651, 0, 0.9996219169112968), z_dir=(0, -1, 0))) as chamfer1_piece_2_section:
        Polygon((CHAMFER1_SIZE * 0.999621916911, -CHAMFER1_SIZE * 0.0274958766106), (-CHAMFER1_SIZE * 0.0274958766106, -CHAMFER1_SIZE * 0.999621916911), (0, 0), align=None)
    chamfer1_piece_2 = extrude(amount=12.043365976, mode=Mode.PRIVATE)
    chamfer1_piece_2 = split(chamfer1_piece_2, bisect_by=Plane(origin=(-8.586169901, 9.121682988, 24.123070146), z_dir=(0, 0, -1)), keep=Keep.TOP, mode=Mode.PRIVATE)
    add(chamfer1_piece_2, mode=Mode.SUBTRACT)

    # Sketch20 → Cut-Extrude16 (cut, up to next)
    with BuildSketch(Plane(origin=(0, 3.1, 0), x_dir=(1, 0, 0), z_dir=(0, 1, 0)), mode=Mode.PRIVATE) as cut_extrude16_sk1:
        with Locations(Location((-20.750201759, -18.623070146, 0), (0, 0, 270))):
            Circle(SKETCH20_R)
    cut_extrude16_tool1 = extrude(cut_extrude16_sk1.sketch, amount=-CUT_EXTRUDE16_REACH, mode=Mode.PRIVATE) & part.part
    # Sketch20 → Cut-Extrude16 (cut, up to next)
    with BuildSketch(Plane(origin=(0, 3.1, 0), x_dir=(1, 0, 0), z_dir=(0, 1, 0)), mode=Mode.PRIVATE) as cut_extrude16_sk2:
        with Locations(Location((-9.750201759, -18.623070146, 0), (0, 0, 270))):
            Circle(SKETCH20_R)
    cut_extrude16_tool2 = extrude(cut_extrude16_sk2.sketch, amount=-CUT_EXTRUDE16_REACH, mode=Mode.PRIVATE) & part.part
    # Sketch20 → Cut-Extrude16 (cut, up to next)
    with BuildSketch(Plane(origin=(0, 3.1, 0), x_dir=(1, 0, 0), z_dir=(0, 1, 0)), mode=Mode.PRIVATE) as cut_extrude16_sk3:
        with Locations(Location((49.249798241, -18.623070146, 0), (0, 0, 270))):
            Circle(SKETCH20_R)
    cut_extrude16_tool3 = extrude(cut_extrude16_sk3.sketch, amount=-CUT_EXTRUDE16_REACH, mode=Mode.PRIVATE) & part.part
    # Sketch20 → Cut-Extrude16 (cut, up to next)
    with BuildSketch(Plane(origin=(0, 3.1, 0), x_dir=(1, 0, 0), z_dir=(0, 1, 0)), mode=Mode.PRIVATE) as cut_extrude16_sk4:
        with Locations(Location((60.249798241, -18.623070146, 0), (0, 0, 270))):
            Circle(SKETCH20_R)
    cut_extrude16_tool4 = extrude(cut_extrude16_sk4.sketch, amount=-CUT_EXTRUDE16_REACH, mode=Mode.PRIVATE) & part.part
    add(cut_extrude16_tool1.solids().sort_by_distance((-20.750202, 3.1, 18.62307))[0], mode=Mode.SUBTRACT)
    add(cut_extrude16_tool2.solids().sort_by_distance((-9.750202, 3.1, 18.62307))[0], mode=Mode.SUBTRACT)
    add(cut_extrude16_tool3.solids().sort_by_distance((49.249798, 3.1, 18.62307))[0], mode=Mode.SUBTRACT)
    add(cut_extrude16_tool4.solids().sort_by_distance((60.249798, 3.1, 18.62307))[0], mode=Mode.SUBTRACT)

    # Sketch22 → Cut-Extrude18 (cut)
    with BuildSketch(Plane(origin=(0, 4.1, 0), x_dir=(1, 0, 0), z_dir=(0, 1, 0))):
        with Locations((19.749798241, -4.623070146)):
            Rectangle(SKETCH22_W, SKETCH22_H)
    extrude(amount=-CUT_EXTRUDE18_DEPTH, mode=Mode.SUBTRACT)

    # Sketch23 → Cut-Extrude19 (cut, up to next)
    with BuildSketch(Plane(origin=(0, 3.5, 0), x_dir=(1, 0, 0), z_dir=(0, 1, 0)), mode=Mode.PRIVATE) as cut_extrude19_sk1:
        with Locations(Location((12.749798241, -4.623070146, 0), (0, 0, 270))):
            Circle(SKETCH23_R)
    cut_extrude19_tool1 = extrude(cut_extrude19_sk1.sketch, amount=-CUT_EXTRUDE19_REACH, mode=Mode.PRIVATE) & part.part
    # Sketch23 → Cut-Extrude19 (cut, up to next)
    with BuildSketch(Plane(origin=(0, 3.5, 0), x_dir=(1, 0, 0), z_dir=(0, 1, 0)), mode=Mode.PRIVATE) as cut_extrude19_sk2:
        with Locations(Location((26.749798241, -4.623070146, 0), (0, 0, 270))):
            Circle(SKETCH23_R)
    cut_extrude19_tool2 = extrude(cut_extrude19_sk2.sketch, amount=-CUT_EXTRUDE19_REACH, mode=Mode.PRIVATE) & part.part
    add(cut_extrude19_tool1.solids().sort_by_distance((12.749798, 3.5, 4.62307))[0], mode=Mode.SUBTRACT)
    add(cut_extrude19_tool2.solids().sort_by_distance((26.749798, 3.5, 4.62307))[0], mode=Mode.SUBTRACT)

    # Fillet4
    fillet4_edges = [part.edges().sort_by_distance(p)[0] for p in [
        (30.099886031, 7.05, 17.623070146),
        (9.04256164, 7.05, 17.623070146),
    ]]
    fillet(fillet4_edges, radius=FILLET4_R)


solid = part.part
